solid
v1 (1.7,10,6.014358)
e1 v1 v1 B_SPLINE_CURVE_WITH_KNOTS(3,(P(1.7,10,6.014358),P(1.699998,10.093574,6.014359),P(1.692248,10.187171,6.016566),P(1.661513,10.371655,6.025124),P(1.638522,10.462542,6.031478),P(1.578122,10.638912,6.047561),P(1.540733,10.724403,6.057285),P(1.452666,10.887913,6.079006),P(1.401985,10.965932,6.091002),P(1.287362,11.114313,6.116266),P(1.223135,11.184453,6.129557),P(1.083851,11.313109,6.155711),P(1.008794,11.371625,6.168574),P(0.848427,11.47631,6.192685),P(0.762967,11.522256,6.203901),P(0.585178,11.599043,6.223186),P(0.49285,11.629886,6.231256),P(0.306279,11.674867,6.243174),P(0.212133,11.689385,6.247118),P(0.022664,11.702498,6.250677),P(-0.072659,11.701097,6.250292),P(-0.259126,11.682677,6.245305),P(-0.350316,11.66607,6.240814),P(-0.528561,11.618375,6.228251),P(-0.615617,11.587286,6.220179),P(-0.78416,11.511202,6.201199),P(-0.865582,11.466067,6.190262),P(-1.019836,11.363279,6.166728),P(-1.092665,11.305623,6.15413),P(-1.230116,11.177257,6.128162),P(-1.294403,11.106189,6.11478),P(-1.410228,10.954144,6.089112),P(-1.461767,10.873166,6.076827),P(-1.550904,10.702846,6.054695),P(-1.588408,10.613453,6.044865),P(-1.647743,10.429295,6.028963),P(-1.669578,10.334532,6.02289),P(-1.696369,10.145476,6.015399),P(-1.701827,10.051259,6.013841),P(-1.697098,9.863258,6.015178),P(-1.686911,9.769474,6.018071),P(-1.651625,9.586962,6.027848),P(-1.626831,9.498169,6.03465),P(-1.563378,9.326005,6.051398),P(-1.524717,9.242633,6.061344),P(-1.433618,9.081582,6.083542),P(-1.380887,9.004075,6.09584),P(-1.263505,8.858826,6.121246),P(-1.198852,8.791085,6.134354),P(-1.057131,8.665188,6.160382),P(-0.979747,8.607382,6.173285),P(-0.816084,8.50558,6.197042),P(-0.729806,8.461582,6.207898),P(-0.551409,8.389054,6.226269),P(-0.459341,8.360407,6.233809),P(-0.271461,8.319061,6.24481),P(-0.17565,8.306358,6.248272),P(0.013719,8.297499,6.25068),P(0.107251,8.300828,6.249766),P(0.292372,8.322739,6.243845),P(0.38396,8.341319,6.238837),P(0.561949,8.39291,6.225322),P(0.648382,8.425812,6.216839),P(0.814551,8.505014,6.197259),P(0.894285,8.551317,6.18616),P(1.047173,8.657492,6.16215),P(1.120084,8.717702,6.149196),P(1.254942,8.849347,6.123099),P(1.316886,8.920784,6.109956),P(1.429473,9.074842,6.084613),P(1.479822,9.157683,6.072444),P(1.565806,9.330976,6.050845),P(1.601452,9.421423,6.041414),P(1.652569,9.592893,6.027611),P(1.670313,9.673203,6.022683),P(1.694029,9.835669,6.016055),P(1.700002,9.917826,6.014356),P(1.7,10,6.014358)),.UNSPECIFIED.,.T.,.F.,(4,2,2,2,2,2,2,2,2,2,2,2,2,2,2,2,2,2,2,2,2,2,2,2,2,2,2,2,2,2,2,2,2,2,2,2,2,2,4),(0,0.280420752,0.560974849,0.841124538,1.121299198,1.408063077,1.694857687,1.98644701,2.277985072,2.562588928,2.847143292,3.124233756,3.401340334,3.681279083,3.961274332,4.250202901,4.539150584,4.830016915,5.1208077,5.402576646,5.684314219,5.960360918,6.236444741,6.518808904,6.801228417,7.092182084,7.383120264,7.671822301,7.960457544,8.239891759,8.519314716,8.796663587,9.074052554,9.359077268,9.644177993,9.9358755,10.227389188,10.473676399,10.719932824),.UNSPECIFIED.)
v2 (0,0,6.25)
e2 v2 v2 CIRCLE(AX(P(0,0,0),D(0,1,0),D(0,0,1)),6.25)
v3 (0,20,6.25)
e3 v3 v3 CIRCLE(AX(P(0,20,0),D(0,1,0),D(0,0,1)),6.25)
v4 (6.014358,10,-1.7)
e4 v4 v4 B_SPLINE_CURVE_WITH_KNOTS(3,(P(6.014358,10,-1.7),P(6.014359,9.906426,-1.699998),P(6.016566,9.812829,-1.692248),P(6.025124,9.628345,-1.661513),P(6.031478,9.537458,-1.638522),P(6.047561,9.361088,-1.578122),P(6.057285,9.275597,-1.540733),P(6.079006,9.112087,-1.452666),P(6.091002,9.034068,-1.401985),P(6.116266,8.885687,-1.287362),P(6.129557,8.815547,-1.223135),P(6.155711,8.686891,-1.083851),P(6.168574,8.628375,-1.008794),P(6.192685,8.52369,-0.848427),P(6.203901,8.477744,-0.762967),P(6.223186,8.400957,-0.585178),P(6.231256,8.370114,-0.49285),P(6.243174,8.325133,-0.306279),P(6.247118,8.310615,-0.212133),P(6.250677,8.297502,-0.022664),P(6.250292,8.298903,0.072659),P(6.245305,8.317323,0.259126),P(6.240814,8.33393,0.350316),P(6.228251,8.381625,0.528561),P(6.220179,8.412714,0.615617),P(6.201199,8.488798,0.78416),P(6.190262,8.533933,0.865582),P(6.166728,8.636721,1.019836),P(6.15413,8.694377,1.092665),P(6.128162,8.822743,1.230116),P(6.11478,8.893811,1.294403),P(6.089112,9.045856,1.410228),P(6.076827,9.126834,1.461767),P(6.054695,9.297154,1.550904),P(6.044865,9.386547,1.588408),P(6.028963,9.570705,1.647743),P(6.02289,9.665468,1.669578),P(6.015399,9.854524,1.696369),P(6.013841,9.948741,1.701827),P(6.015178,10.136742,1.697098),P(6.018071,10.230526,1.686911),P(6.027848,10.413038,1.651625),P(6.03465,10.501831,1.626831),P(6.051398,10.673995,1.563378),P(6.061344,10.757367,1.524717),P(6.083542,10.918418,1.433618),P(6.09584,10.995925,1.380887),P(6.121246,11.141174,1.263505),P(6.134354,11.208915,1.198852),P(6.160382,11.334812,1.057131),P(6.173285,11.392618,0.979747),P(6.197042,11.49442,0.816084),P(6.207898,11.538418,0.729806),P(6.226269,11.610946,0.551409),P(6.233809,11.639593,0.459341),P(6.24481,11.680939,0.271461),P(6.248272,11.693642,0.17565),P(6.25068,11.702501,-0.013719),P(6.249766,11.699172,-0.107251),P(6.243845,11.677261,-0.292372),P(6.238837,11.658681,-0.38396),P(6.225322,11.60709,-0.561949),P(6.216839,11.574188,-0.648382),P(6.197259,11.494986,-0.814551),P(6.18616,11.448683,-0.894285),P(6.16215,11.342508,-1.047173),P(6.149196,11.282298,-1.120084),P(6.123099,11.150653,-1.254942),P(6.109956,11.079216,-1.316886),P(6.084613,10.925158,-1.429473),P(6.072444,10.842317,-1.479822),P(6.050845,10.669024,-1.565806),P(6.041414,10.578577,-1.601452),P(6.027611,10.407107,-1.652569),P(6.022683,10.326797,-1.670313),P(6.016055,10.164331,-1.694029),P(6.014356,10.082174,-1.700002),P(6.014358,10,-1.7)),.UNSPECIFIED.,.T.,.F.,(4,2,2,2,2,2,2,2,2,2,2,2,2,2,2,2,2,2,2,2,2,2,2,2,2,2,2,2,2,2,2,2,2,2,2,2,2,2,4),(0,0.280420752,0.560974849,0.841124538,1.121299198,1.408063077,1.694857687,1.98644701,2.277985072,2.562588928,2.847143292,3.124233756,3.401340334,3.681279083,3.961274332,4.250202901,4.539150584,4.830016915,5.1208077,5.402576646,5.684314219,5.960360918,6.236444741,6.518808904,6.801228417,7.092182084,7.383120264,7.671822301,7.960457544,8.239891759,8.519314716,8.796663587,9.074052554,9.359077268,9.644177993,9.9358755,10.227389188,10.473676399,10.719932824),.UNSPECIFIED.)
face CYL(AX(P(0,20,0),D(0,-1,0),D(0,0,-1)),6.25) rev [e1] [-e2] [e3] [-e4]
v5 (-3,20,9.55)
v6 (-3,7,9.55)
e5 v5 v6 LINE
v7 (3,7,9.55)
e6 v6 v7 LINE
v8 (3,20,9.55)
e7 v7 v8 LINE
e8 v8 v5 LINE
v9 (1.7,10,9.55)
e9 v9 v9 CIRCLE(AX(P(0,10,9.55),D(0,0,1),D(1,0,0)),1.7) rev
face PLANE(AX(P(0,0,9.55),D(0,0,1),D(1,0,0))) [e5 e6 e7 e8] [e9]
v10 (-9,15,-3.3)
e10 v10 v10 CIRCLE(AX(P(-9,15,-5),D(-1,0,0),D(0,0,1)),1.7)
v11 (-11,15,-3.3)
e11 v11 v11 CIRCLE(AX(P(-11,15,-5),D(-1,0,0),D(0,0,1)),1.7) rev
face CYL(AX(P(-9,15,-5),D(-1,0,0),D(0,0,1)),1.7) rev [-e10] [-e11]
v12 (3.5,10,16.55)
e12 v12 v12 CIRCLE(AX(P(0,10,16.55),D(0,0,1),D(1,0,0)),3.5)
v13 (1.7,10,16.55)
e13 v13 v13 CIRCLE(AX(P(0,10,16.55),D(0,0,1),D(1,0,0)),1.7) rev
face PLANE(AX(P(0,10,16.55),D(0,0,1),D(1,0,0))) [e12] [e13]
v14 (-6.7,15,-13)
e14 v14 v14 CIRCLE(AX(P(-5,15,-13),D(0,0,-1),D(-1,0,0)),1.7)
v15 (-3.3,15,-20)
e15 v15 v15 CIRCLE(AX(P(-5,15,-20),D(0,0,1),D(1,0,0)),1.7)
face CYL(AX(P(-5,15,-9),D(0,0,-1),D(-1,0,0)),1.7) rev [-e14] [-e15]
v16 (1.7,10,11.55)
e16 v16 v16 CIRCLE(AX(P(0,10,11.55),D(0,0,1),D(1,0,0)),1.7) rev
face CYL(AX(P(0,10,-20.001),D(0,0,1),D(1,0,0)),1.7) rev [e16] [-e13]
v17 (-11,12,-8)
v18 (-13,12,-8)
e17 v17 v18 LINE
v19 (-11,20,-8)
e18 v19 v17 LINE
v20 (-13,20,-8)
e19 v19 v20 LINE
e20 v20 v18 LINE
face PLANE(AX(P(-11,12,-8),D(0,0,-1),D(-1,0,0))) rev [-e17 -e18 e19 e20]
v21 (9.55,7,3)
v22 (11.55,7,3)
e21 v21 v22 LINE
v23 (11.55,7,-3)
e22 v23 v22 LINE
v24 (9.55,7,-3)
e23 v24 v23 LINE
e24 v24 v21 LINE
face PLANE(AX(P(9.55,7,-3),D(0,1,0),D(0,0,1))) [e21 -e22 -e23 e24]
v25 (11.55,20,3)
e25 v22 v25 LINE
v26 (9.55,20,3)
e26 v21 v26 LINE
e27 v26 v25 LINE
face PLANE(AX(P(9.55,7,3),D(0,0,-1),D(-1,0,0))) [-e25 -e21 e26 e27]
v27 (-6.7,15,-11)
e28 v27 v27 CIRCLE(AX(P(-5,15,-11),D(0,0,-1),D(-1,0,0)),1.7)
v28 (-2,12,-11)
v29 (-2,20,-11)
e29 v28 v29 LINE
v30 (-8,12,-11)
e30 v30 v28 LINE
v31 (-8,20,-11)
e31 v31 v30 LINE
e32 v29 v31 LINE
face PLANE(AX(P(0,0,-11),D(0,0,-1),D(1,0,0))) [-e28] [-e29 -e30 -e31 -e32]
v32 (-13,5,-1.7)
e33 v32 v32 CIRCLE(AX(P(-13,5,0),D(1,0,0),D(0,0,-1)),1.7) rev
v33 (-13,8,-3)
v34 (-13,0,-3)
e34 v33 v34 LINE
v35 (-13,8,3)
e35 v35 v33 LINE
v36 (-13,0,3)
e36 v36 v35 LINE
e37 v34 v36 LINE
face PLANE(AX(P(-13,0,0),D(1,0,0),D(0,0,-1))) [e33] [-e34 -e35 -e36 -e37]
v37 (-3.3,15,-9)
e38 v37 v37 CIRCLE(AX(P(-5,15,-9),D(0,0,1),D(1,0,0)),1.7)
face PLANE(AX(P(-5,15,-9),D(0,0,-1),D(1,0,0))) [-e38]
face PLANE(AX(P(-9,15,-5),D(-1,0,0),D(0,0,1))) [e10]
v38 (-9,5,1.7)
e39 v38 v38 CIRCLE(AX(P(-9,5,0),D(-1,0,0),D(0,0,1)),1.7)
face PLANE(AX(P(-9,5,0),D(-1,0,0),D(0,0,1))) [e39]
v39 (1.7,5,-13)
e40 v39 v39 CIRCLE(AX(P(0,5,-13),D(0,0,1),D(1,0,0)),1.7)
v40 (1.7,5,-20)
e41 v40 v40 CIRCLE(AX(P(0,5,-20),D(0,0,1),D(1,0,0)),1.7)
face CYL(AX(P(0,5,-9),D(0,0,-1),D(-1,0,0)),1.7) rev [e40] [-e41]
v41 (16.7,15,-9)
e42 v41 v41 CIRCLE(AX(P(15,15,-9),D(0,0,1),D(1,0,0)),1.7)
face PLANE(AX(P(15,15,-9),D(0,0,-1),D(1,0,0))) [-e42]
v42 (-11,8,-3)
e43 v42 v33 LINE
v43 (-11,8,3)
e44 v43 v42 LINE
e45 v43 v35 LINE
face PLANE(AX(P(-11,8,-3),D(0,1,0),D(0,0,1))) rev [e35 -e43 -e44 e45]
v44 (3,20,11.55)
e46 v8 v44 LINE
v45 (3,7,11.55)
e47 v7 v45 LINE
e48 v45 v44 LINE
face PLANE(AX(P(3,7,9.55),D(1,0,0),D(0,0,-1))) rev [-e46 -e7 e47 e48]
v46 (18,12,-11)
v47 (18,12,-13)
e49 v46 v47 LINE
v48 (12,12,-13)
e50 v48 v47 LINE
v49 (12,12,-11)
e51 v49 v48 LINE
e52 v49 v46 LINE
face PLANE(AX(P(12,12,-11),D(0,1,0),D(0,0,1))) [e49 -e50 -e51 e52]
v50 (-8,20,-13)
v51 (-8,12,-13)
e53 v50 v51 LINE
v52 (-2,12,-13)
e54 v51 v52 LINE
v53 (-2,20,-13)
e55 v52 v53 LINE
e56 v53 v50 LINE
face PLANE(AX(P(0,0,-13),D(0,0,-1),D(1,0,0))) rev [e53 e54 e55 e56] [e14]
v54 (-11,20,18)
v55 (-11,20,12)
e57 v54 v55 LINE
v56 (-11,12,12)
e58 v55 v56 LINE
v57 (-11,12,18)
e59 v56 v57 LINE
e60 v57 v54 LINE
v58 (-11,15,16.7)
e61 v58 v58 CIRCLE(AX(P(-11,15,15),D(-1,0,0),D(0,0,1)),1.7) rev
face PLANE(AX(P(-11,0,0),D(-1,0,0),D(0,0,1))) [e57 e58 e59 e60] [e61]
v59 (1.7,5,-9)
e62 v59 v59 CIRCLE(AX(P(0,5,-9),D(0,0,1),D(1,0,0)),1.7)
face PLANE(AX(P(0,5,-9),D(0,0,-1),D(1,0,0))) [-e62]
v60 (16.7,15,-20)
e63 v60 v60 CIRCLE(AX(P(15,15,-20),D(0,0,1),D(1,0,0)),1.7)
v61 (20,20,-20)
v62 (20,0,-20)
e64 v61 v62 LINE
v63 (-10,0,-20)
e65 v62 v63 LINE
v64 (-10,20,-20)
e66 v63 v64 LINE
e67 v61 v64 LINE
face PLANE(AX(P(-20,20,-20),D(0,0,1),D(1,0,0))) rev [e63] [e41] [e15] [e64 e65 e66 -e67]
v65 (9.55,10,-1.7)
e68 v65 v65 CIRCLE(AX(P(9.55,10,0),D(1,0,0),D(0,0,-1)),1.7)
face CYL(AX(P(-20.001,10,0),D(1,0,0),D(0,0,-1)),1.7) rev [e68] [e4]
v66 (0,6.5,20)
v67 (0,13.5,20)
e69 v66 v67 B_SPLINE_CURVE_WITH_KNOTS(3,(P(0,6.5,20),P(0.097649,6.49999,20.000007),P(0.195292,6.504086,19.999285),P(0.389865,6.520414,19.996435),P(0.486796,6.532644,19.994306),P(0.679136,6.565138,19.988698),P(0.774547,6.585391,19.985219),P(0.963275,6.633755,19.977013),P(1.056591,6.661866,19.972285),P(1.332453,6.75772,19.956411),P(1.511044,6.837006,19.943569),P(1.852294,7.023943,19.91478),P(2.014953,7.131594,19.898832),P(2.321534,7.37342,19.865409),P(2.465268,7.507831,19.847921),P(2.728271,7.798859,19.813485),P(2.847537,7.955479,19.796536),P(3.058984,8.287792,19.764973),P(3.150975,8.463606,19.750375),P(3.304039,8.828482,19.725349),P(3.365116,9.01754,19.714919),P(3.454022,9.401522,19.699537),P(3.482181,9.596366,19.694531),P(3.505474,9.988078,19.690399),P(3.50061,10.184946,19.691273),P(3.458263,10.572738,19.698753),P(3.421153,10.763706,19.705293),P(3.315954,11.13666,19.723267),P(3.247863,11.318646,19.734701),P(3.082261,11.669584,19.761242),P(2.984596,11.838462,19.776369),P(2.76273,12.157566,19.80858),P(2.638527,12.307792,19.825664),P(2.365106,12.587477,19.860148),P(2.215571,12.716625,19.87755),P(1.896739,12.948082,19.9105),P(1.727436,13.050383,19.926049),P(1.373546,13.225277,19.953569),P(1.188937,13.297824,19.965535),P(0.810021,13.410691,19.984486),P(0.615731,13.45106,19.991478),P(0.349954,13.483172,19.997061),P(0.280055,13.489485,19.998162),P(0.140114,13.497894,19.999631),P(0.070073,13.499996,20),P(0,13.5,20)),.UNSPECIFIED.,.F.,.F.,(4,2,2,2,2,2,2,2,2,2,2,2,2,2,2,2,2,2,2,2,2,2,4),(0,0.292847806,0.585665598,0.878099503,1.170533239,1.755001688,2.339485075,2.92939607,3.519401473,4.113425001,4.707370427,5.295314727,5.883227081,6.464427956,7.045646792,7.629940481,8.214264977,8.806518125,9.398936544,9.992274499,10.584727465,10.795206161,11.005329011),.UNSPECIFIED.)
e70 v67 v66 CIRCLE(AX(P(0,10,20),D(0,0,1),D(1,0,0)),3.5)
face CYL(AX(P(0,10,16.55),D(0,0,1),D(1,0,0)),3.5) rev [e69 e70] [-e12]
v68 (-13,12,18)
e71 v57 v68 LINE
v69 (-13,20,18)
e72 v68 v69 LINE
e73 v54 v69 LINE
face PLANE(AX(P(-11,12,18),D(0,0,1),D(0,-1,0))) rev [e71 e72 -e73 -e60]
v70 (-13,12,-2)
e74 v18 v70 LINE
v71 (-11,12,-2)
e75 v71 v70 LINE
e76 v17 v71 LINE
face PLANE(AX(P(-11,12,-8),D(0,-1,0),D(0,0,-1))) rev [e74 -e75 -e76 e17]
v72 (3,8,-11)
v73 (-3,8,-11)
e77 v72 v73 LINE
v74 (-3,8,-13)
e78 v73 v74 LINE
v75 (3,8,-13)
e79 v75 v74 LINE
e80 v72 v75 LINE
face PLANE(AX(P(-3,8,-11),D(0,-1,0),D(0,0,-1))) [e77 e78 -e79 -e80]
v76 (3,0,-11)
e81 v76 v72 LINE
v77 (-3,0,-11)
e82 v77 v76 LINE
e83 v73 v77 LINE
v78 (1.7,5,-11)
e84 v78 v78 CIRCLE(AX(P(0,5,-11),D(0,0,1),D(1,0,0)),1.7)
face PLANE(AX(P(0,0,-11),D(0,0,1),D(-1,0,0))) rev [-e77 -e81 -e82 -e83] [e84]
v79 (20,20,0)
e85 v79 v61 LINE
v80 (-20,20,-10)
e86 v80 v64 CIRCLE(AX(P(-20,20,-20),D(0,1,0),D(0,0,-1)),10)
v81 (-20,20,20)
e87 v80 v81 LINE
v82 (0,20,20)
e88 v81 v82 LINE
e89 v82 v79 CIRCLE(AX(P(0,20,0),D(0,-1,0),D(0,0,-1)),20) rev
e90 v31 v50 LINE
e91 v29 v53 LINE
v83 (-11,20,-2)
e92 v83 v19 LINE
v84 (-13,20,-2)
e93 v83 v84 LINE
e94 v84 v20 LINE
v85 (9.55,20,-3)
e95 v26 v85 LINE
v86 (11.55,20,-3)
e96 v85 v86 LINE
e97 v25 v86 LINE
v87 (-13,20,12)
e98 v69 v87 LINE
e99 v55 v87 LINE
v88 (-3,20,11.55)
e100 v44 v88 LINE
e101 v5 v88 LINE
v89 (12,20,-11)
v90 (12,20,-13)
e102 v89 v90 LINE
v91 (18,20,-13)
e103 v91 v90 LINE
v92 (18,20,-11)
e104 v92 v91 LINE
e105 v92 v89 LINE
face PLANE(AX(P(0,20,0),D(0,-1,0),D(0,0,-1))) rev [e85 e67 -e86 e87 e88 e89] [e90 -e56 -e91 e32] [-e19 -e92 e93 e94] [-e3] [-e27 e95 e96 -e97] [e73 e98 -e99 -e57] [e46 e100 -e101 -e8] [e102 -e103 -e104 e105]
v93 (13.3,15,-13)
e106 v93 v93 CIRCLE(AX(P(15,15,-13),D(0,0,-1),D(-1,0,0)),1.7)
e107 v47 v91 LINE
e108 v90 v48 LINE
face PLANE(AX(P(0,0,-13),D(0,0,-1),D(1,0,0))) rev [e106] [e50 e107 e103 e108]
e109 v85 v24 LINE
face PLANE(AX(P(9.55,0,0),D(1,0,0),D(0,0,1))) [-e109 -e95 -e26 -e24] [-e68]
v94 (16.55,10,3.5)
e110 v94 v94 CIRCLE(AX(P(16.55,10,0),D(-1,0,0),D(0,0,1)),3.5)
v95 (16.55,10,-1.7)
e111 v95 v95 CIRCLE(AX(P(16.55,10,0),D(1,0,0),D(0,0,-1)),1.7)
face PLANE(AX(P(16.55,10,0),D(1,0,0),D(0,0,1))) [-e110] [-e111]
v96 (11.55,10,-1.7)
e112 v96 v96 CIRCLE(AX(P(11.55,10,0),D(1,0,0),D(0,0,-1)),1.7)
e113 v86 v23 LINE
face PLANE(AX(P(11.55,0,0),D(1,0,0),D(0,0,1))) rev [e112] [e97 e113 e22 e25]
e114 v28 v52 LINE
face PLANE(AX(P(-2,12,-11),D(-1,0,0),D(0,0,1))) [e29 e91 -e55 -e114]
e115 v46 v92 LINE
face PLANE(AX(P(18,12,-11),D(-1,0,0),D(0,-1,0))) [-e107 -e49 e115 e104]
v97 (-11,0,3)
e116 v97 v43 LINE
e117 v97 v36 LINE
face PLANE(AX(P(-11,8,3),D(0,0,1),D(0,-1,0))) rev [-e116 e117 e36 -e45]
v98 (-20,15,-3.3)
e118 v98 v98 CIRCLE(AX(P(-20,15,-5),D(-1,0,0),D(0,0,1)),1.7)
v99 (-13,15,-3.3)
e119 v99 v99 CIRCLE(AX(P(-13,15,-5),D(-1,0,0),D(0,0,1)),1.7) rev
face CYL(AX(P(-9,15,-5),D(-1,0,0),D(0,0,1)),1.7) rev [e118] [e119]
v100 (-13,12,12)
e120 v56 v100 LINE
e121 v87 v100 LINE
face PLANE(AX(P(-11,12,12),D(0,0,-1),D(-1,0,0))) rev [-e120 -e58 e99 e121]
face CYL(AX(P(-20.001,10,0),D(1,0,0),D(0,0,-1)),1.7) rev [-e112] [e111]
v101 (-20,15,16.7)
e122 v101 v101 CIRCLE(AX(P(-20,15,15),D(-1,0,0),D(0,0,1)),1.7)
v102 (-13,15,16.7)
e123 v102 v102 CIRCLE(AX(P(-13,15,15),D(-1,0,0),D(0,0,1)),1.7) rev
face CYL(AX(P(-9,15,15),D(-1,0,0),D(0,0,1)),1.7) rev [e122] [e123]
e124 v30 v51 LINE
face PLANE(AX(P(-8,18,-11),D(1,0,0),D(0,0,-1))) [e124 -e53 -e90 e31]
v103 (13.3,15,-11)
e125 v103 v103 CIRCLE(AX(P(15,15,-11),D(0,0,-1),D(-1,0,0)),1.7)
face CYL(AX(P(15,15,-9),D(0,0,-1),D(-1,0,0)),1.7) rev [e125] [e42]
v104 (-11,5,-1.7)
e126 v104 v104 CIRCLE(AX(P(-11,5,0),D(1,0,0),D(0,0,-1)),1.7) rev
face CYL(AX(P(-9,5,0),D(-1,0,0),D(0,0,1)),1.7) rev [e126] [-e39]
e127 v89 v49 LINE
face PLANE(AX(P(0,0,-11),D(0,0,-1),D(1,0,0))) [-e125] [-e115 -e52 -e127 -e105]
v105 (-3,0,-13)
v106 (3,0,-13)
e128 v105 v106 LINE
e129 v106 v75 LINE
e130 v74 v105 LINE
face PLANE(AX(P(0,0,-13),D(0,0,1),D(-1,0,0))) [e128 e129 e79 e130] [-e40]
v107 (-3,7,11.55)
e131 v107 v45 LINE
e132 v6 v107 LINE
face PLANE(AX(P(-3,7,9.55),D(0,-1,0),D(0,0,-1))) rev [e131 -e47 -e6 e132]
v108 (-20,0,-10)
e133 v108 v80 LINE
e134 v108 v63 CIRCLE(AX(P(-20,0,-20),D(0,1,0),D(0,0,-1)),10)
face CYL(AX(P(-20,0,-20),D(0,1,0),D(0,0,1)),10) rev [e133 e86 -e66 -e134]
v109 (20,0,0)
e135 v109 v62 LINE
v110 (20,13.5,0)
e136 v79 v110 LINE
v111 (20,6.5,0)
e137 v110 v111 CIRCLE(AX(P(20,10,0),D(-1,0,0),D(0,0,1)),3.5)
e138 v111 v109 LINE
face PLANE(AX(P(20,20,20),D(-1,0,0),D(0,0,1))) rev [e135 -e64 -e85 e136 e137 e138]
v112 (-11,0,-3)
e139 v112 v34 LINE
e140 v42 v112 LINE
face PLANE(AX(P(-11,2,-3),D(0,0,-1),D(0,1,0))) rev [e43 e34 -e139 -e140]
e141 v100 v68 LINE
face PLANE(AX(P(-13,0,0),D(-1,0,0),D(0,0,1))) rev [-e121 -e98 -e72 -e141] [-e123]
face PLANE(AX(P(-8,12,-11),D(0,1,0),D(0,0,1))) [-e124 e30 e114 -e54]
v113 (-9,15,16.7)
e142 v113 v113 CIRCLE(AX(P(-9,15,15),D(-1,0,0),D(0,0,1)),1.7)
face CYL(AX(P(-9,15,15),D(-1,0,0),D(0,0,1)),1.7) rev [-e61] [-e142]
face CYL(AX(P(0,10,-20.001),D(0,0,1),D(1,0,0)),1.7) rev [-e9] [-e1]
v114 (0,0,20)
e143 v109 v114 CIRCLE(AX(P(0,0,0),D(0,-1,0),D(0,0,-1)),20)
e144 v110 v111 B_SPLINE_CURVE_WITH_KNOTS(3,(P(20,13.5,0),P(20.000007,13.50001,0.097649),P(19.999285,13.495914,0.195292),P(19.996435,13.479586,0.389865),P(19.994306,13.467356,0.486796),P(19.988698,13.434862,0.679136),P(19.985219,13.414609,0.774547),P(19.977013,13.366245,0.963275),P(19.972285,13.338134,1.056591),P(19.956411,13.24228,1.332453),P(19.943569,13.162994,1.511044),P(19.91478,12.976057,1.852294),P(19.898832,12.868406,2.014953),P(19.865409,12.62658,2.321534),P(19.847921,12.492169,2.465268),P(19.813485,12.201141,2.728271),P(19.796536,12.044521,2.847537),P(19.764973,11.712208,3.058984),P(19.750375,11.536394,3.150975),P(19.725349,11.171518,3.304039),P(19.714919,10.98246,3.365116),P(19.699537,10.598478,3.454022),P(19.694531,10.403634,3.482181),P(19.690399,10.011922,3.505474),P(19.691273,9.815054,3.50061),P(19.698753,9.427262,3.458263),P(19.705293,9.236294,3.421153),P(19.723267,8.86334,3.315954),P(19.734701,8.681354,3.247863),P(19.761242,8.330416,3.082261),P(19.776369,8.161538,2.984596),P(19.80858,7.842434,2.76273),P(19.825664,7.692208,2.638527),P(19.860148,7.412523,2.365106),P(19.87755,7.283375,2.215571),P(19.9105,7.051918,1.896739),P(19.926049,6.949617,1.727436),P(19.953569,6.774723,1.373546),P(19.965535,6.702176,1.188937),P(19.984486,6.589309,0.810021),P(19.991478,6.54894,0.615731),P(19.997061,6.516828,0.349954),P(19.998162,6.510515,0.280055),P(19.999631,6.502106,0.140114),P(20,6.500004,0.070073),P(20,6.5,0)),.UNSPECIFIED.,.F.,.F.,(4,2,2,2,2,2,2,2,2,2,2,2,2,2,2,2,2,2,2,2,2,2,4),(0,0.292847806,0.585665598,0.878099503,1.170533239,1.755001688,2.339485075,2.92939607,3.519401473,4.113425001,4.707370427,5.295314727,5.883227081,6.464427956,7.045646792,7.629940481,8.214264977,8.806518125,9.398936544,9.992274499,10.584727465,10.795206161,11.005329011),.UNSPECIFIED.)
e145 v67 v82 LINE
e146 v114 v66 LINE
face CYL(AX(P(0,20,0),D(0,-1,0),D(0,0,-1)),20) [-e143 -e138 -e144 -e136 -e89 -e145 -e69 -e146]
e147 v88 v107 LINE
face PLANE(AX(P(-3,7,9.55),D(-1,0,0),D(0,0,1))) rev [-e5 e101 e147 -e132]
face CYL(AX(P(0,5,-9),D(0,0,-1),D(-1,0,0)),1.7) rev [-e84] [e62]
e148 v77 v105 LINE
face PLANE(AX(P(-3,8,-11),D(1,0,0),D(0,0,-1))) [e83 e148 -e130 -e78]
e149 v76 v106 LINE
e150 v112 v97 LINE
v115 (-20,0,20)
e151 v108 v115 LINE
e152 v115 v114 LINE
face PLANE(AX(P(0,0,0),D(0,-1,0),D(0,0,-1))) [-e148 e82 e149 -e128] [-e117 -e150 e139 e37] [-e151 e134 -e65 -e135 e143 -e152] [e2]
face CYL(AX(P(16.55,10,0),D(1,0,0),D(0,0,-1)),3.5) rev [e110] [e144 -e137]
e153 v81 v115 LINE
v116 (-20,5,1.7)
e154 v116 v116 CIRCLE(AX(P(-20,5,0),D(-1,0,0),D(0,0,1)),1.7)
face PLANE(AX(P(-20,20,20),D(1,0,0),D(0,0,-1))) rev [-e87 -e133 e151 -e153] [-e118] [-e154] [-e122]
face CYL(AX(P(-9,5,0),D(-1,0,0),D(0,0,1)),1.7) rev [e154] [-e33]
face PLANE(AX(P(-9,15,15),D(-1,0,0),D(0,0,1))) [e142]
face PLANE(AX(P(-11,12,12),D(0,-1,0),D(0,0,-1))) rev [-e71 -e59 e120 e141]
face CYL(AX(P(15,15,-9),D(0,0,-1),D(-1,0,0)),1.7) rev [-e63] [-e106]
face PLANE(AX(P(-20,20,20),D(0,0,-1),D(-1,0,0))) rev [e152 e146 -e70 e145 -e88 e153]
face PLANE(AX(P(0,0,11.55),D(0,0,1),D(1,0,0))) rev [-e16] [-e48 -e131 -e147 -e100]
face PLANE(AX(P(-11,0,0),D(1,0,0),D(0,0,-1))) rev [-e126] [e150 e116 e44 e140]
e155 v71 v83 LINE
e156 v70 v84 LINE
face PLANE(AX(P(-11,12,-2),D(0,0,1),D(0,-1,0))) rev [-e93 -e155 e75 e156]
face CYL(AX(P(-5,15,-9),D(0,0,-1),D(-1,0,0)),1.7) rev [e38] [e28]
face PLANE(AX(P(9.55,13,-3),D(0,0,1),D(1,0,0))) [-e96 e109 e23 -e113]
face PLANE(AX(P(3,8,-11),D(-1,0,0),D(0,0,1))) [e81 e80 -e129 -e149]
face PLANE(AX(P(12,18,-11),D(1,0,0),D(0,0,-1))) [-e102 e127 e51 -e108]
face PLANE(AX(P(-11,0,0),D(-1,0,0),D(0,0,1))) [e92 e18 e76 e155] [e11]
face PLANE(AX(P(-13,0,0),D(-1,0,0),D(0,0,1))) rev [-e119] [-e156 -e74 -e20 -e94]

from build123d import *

# Parameters (mm, degrees)
SKETCH1_W               = 40
SKETCH1_H               = 40
SKETCH1_R               = 6.25
BOSS_EXTRUDE1_DEPTH     = 20
SKETCH2_R               = 1.7
CUT_EXTRUDE1_DEPTH      = 11
CUT_EXTRUDE2_START      = -7
CUT_EXTRUDE2_DEPTH      = 2
CUT_EXTRUDE3_REACH      = 50.99
CUT_EXTRUDE3_END_RADIUS = 6.25
SKETCH4_R               = 1.7
CUT_EXTRUDE4_START      = -8.45
CUT_EXTRUDE4_DEPTH      = 2
SKETCH6_R               = 3.5
CUT_EXTRUDE5_DEPTH      = 3.45
FILLET1_R               = 20
CUT_EXTRUDE6_DEPTH      = 35.641016325


with BuildPart() as part:
    # Sketch1 → Boss-Extrude1 (new body)
    with BuildSketch(Plane(origin=(0, 0, 0), x_dir=(1, 0, 0), z_dir=(0, 1, 0))):
        Rectangle(SKETCH1_W, SKETCH1_H)
        with Locations(Location((0, 0, 0), (0, 0, 270))):
            Circle(SKETCH1_R, mode=Mode.SUBTRACT)
    extrude(amount=BOSS_EXTRUDE1_DEPTH)

    # Sketch2 → Cut-Extrude1 (cut)
    with BuildSketch(Plane.ZY.offset(20)):
        with Locations((-5, 15)):
            Circle(SKETCH2_R)
        with Locations((15, 15)):
            Circle(SKETCH2_R)
        with Locations((0, 5)):
            Circle(SKETCH2_R)
    cut_extrude1 = extrude(amount=-CUT_EXTRUDE1_DEPTH, mode=Mode.SUBTRACT)

    # Sketch3 → Cut-Extrude2 (cut)
    with BuildSketch(Plane.ZY.offset(20).offset(CUT_EXTRUDE2_START)):
        Polygon((-8, 12), (-2, 12), (-2, 18), (-2, 20), (-8, 20), (-8, 18), align=None)
        Polygon((12, 12), (18, 12), (18, 18), (18, 20), (12, 20), (12, 18), align=None)
        Polygon((-3, 8), (3, 8), (3, 2), (3, 0), (-3, 0), (-3, 2), align=None)
    cut_extrude2 = extrude(amount=-CUT_EXTRUDE2_DEPTH, mode=Mode.SUBTRACT)

    # Cut-Extrude3: up to this cylinder (the profile starts outside it)
    cut_extrude3_end = Plane(origin=(0, 10, 0), z_dir=(0, -1, 0)) * Cylinder(CUT_EXTRUDE3_END_RADIUS, 115.48, mode=Mode.PRIVATE)
    # Sketch4 → Cut-Extrude3 (cut, up to the surface)
    with BuildSketch(Plane.XY.offset(20), mode=Mode.PRIVATE) as cut_extrude3_sk1:
        with Locations((0, 10)):
            Circle(SKETCH4_R)
    cut_extrude3_tool1 = extrude(cut_extrude3_sk1.sketch, amount=-CUT_EXTRUDE3_REACH, mode=Mode.PRIVATE) - cut_extrude3_end
    cut_extrude3 = cut_extrude3_tool1.solids().sort_by_distance((0, 10, 20))[0]
    add(cut_extrude3, mode=Mode.SUBTRACT)

    # Sketch5 → Cut-Extrude4 (cut)
    with BuildSketch(Plane.XY.offset(20).offset(CUT_EXTRUDE4_START)):
        Polygon((-3, 13), (-3, 20), (3, 20), (3, 13), (3, 7), (-3, 7), align=None)
    cut_extrude4 = extrude(amount=-CUT_EXTRUDE4_DEPTH, mode=Mode.SUBTRACT)

    # Sketch6 → Cut-Extrude5 (cut)
    with BuildSketch(Plane.XY.offset(20)):
        with Locations((0, 10)):
            Circle(SKETCH6_R)
    cut_extrude5 = extrude(amount=-CUT_EXTRUDE5_DEPTH, mode=Mode.SUBTRACT)

    # Mirror1: Cut-Extrude1, Cut-Extrude2, Cut-Extrude3, Cut-Extrude4, Cut-Extrude5 across plane
    add(cut_extrude1.mirror(Plane(origin=(0, 0, 0), x_dir=(0.7071067811865476, 0, 0.7071067811865476), z_dir=(-0.7071067811865477, 0, 0.7071067811865475))), mode=Mode.SUBTRACT)
    add(cut_extrude2.mirror(Plane(origin=(0, 0, 0), x_dir=(0.7071067811865476, 0, 0.7071067811865476), z_dir=(-0.7071067811865477, 0, 0.7071067811865475))), mode=Mode.SUBTRACT)
    add(cut_extrude3.mirror(Plane(origin=(0, 0, 0), x_dir=(0.7071067811865476, 0, 0.7071067811865476), z_dir=(-0.7071067811865477, 0, 0.7071067811865475))), mode=Mode.SUBTRACT)
    add(cut_extrude4.mirror(Plane(origin=(0, 0, 0), x_dir=(0.7071067811865476, 0, 0.7071067811865476), z_dir=(-0.7071067811865477, 0, 0.7071067811865475))), mode=Mode.SUBTRACT)
    add(cut_extrude5.mirror(Plane(origin=(0, 0, 0), x_dir=(0.7071067811865476, 0, 0.7071067811865476), z_dir=(-0.7071067811865477, 0, 0.7071067811865475))), mode=Mode.SUBTRACT)

    # Fillet1
    # the kernel refuses this fillet: 20 mm, written as the material it takes off along each edge
    with BuildSketch(Plane(origin=(20, -50, 20), x_dir=(-1, 0, 0), z_dir=(0, 1, 0))) as fillet1_piece_1:
        with BuildLine():
            CenterArc((FILLET1_R, -FILLET1_R), FILLET1_R, 90, 90)
            Line((0, -FILLET1_R), (0, 0))
            Line((0, 0), (FILLET1_R, 0))
        make_face()
    extrude(amount=120, mode=Mode.SUBTRACT)

    # Sketch7 → Cut-Extrude6 (cut, through all)
    with BuildSketch(Plane(origin=(0, 20, 0), x_dir=(1, 0, 0), z_dir=(0, 1, 0))):
        with BuildLine():
            Line((-20, 10), (-20, 20))
            Line((-20, 20), (-10, 20))
            ThreePointArc((-10, 20), (-12.928932188, 12.928932188), (-20, 10))
        make_face()
    extrude(amount=-CUT_EXTRUDE6_DEPTH, mode=Mode.SUBTRACT)


solid = part.part
